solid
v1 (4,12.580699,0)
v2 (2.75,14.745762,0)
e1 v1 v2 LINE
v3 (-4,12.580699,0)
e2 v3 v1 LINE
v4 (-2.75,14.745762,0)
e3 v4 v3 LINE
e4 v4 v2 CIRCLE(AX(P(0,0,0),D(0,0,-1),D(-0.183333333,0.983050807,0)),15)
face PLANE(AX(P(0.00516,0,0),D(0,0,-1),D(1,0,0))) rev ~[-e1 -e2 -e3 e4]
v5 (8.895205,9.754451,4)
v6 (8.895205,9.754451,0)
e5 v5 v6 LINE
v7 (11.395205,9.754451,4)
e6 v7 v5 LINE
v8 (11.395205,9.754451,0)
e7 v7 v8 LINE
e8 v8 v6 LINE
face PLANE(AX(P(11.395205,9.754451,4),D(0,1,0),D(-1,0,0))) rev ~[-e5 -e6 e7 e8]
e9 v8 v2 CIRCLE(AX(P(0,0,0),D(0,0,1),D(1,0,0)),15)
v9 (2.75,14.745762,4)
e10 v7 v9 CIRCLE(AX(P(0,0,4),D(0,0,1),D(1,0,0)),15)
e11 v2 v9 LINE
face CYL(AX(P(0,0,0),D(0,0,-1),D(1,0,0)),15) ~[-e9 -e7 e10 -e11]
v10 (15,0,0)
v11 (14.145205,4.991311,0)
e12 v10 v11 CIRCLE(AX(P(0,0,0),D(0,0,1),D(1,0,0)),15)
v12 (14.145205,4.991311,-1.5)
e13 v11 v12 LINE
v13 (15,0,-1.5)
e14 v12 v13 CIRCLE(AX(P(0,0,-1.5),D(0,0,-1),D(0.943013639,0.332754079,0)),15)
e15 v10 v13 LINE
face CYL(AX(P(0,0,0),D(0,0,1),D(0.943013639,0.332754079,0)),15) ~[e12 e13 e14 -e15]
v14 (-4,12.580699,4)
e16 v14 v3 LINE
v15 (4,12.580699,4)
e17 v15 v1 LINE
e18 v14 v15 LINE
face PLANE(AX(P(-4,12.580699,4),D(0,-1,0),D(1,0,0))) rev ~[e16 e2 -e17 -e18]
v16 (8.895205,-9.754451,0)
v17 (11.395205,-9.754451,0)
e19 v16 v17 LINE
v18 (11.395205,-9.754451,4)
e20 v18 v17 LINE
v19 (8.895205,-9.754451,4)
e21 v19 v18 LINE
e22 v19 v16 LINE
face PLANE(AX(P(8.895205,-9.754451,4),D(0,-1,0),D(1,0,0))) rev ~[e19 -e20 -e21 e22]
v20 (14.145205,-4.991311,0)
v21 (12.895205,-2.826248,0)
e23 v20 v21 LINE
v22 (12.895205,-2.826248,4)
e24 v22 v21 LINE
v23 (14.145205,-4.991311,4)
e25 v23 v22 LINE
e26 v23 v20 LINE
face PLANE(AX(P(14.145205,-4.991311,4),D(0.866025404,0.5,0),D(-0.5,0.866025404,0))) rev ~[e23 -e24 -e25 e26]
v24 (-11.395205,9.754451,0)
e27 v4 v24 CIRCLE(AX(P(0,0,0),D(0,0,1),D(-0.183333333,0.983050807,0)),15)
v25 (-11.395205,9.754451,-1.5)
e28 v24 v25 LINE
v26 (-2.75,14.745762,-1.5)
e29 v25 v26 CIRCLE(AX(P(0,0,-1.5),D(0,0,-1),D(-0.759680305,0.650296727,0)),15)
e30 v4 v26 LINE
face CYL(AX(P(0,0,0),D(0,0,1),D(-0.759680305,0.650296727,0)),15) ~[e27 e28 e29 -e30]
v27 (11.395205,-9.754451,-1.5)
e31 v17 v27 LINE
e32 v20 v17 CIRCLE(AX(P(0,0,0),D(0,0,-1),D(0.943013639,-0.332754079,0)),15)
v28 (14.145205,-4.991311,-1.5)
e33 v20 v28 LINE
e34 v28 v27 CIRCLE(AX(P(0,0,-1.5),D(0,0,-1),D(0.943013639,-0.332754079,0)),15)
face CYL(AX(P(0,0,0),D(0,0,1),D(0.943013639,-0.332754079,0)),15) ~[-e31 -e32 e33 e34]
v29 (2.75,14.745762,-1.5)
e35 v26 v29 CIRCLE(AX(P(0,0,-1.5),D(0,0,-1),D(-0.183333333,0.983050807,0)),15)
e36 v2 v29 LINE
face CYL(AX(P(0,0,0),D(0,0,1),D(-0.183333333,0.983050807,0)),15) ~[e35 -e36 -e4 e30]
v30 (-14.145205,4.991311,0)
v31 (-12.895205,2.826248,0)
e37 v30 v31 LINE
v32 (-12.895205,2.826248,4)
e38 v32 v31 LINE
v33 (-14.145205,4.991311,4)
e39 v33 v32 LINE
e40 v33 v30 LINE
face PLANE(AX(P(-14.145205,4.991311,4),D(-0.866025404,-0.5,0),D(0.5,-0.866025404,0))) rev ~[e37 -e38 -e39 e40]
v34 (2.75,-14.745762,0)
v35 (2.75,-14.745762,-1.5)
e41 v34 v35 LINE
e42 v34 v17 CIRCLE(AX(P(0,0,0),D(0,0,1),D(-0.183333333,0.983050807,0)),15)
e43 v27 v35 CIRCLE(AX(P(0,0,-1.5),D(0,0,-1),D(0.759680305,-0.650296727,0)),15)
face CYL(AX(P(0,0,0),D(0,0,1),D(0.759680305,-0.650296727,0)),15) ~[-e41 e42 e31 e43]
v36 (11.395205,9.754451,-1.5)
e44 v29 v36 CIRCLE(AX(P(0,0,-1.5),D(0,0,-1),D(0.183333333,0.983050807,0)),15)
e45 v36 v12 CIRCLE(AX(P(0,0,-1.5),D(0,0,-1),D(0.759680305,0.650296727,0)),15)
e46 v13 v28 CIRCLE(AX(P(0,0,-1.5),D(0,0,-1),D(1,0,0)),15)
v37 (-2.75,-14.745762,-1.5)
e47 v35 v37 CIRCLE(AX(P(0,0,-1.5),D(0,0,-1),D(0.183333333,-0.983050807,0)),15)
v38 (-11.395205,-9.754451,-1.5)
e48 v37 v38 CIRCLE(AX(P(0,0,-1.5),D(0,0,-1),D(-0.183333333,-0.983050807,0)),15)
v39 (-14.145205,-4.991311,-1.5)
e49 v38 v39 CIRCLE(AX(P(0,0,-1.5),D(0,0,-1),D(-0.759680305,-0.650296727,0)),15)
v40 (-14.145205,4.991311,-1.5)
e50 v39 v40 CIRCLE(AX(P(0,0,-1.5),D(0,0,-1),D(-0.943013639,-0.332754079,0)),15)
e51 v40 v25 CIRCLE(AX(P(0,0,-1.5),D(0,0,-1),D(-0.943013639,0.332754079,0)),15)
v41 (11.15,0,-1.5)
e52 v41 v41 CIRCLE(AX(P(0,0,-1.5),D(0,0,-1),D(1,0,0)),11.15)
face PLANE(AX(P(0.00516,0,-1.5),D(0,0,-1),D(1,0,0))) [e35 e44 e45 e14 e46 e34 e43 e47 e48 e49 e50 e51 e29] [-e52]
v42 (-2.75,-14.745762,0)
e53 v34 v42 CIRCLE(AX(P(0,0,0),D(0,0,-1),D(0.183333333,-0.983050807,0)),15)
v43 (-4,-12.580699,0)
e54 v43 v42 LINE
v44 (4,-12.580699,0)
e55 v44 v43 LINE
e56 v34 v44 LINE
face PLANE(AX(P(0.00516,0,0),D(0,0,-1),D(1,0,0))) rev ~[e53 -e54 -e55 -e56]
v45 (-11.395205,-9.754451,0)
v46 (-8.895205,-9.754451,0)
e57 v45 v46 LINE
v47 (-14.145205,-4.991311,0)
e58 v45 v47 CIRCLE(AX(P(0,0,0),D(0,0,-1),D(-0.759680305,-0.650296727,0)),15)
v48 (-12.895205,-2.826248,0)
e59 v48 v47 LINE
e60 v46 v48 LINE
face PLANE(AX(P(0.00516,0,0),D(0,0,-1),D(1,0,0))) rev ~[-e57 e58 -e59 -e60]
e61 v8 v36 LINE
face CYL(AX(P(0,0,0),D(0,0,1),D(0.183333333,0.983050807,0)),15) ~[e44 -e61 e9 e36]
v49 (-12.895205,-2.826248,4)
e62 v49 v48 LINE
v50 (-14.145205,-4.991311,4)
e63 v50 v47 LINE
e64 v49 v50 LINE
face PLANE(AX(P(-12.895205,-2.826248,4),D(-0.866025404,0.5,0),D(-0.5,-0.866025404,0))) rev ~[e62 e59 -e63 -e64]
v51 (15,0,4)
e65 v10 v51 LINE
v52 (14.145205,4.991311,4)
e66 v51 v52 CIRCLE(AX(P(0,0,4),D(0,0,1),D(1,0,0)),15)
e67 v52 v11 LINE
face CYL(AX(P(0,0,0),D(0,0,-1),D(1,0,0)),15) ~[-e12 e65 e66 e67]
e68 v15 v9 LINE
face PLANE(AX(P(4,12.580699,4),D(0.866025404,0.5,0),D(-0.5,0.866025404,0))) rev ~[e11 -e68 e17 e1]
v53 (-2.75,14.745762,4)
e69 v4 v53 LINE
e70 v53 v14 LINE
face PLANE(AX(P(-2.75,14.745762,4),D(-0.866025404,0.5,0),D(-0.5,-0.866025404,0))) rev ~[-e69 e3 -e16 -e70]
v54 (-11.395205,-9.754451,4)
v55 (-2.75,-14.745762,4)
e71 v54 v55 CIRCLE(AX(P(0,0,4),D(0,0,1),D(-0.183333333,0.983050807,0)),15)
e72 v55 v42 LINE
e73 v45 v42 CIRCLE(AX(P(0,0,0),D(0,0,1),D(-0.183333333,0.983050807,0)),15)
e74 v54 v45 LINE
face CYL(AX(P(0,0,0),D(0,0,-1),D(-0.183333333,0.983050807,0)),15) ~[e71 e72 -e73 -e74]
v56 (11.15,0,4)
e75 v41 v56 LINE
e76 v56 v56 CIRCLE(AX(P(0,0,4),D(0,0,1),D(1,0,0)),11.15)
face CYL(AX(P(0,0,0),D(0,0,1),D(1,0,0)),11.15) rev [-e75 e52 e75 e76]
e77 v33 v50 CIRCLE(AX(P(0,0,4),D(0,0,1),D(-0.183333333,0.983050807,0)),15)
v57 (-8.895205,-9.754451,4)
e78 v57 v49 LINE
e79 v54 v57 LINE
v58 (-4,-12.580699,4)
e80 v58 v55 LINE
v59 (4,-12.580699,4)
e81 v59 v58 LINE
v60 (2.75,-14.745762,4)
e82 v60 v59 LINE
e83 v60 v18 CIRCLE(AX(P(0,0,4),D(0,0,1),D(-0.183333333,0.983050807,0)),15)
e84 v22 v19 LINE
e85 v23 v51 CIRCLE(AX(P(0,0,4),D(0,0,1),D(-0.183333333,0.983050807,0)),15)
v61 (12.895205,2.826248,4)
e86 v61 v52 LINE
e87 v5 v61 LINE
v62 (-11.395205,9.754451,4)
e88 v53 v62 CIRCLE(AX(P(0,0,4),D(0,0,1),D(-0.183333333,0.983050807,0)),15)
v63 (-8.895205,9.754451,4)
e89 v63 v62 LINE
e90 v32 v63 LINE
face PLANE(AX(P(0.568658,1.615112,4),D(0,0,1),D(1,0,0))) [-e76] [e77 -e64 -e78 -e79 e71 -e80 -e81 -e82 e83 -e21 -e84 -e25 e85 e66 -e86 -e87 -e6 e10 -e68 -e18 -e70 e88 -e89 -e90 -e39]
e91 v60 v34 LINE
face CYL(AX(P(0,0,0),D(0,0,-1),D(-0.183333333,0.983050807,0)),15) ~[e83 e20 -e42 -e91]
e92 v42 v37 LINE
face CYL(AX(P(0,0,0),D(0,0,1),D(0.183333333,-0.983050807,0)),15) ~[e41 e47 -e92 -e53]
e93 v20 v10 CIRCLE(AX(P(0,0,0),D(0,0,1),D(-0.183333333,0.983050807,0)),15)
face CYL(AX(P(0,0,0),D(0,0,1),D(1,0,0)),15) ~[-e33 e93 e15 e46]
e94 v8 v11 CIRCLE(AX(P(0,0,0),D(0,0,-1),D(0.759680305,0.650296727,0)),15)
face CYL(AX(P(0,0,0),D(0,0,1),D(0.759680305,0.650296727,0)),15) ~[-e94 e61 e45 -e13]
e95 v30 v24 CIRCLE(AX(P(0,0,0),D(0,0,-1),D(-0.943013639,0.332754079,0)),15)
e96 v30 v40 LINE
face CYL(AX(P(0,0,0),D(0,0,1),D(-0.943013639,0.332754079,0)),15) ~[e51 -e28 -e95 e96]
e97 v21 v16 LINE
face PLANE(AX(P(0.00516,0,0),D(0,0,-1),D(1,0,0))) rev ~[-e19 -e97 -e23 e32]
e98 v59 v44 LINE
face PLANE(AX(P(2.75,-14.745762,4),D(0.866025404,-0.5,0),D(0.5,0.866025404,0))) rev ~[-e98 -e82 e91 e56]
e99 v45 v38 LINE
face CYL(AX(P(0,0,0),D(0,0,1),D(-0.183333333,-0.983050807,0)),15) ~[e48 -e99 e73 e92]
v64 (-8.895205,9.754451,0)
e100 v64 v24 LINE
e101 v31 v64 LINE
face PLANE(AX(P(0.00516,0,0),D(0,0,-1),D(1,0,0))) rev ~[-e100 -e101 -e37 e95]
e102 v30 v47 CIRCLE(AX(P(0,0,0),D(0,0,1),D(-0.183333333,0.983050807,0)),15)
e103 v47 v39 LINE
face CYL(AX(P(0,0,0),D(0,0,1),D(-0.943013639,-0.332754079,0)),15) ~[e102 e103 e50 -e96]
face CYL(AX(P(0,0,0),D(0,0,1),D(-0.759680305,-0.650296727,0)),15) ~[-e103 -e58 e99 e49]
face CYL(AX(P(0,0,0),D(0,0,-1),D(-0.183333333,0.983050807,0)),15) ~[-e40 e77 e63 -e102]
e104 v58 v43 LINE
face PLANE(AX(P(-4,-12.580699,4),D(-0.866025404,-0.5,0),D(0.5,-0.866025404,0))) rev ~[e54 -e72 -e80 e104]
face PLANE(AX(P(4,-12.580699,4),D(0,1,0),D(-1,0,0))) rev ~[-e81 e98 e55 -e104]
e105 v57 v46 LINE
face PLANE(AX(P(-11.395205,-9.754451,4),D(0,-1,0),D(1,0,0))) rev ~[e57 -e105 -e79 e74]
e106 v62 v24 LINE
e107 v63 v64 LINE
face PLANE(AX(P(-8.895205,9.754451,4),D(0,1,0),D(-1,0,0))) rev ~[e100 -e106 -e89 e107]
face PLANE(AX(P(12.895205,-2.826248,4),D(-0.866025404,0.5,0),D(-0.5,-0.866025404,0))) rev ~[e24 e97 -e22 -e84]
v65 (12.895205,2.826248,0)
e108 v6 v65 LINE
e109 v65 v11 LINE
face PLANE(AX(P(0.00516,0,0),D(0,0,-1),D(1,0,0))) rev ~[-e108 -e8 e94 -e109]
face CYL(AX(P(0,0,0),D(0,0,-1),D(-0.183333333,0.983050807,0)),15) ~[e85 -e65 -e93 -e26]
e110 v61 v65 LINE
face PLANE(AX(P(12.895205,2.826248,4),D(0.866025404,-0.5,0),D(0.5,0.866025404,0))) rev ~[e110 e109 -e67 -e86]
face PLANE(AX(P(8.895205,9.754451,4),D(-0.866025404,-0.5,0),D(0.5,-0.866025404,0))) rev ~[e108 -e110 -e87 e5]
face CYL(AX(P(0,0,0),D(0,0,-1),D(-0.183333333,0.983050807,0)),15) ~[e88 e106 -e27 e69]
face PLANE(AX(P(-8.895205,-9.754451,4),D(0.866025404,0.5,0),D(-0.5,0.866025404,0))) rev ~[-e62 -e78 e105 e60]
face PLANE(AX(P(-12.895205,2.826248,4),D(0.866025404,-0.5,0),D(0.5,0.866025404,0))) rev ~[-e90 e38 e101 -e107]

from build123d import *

# Parameters (mm, degrees)
F0_R     = 11.15
F1_DEPTH = 4
F3_DEPTH = 16.2
F4_R     = 11.15
F5_DEPTH = 1.5


with BuildPart() as f1:
    # F0 (on Top) → F1 (new body)
    with BuildSketch(Plane.XY):
        with BuildLine():
            ThreePointArc((-2.75, 14.7457621031), (-9.5851447563, -11.5379807592), (15, 0))
            ThreePointArc((15, 0), (11.5379807592, 9.5851447563), (2.75, 14.7457621031))
            Line((2.75, 14.7457621031), (4, 12.5806985936))
            Line((4, 12.5806985936), (0, 12.5806985936))
            Line((0, 12.5806985936), (-4, 12.5806985936))
            Line((-4, 12.5806985936), (-2.75, 14.7457621031))
        make_face()
        Circle(F0_R, mode=Mode.SUBTRACT)
        with BuildLine():
            Line((4, 12.5806985936), (2.75, 14.7457621031))
            ThreePointArc((2.75, 14.7457621031), (0, 15), (-2.75, 14.7457621031))
            Line((-2.75, 14.7457621031), (-4, 12.5806985936))
            Line((-4, 12.5806985936), (0, 12.5806985936))
            Line((0, 12.5806985936), (4, 12.5806985936))
        make_face()
    extrude(amount=F1_DEPTH)

    # F2 (on face) → F3 (cut)
    with BuildSketch(Plane.XY.offset(4)):
        with BuildLine():
            ThreePointArc((-11.3952045794, 9.7544509119), (-12.9903810568, 7.5), (-14.1452045794, 4.9913111911))
            Line((-14.1452045794, 4.9913111911), (-12.8952045794, 2.8262476817))
            Line((-12.8952045794, 2.8262476817), (-8.8952045794, 9.7544509119))
            Line((-8.8952045794, 9.7544509119), (-11.3952045794, 9.7544509119))
        make_face()
        with BuildLine():
            Line((-12.8952045794, -2.8262476817), (-14.1452045794, -4.9913111911))
            ThreePointArc((-14.1452045794, -4.9913111911), (-12.9903810568, -7.5), (-11.3952045794, -9.7544509119))
            Line((-11.3952045794, -9.7544509119), (-8.8952045794, -9.7544509119))
            Line((-8.8952045794, -9.7544509119), (-12.8952045794, -2.8262476817))
        make_face()
        with BuildLine():
            Line((-4, -12.5806985936), (-2.75, -14.7457621031))
            ThreePointArc((-2.75, -14.7457621031), (0, -15), (2.75, -14.7457621031))
            Line((2.75, -14.7457621031), (4, -12.5806985936))
            Line((4, -12.5806985936), (-4, -12.5806985936))
        make_face()
        with BuildLine():
            Line((8.8952045794, -9.7544509119), (11.3952045794, -9.7544509119))
            ThreePointArc((11.3952045794, -9.7544509119), (12.9903810568, -7.5), (14.1452045794, -4.9913111911))
            Line((14.1452045794, -4.9913111911), (12.8952045794, -2.8262476817))
            Line((12.8952045794, -2.8262476817), (8.8952045794, -9.7544509119))
        make_face()
        with BuildLine():
            ThreePointArc((14.1452045794, 4.9913111911), (12.9903810568, 7.5), (11.3952045794, 9.7544509119))
            Line((11.3952045794, 9.7544509119), (8.8952045794, 9.7544509119))
            Line((8.8952045794, 9.7544509119), (12.8952045794, 2.8262476817))
            Line((12.8952045794, 2.8262476817), (14.1452045794, 4.9913111911))
        make_face()
        with BuildLine():
            ThreePointArc((2.75, 14.7457621031), (0, 15), (-2.75, 14.7457621031))
            Line((-2.75, 14.7457621031), (-4, 12.5806985936))
            Line((-4, 12.5806985936), (4, 12.5806985936))
            Line((4, 12.5806985936), (2.75, 14.7457621031))
        make_face()
    extrude(amount=-F3_DEPTH, mode=Mode.SUBTRACT)

    # F4 (on face) → F5 (join)
    with BuildSketch(Plane(origin=(0, 0, 0), x_dir=(1, 0, 0), z_dir=(0, 0, -1))):
        with BuildLine():
            ThreePointArc((14.1452045794, -4.9913111911), (14.784756824, -2.5319884783), (15, 0))
            ThreePointArc((15, 0), (14.784756824, 2.5319884783), (14.1452045794, 4.9913111911))
            Line((14.1452045794, 4.9913111911), (12.8952045794, 2.8262476817))
            Line((12.8952045794, 2.8262476817), (8.8952045794, 9.7544509119))
            Line((8.8952045794, 9.7544509119), (11.3952045794, 9.7544509119))
            ThreePointArc((11.3952045794, 9.7544509119), (7.5, 12.9903810568), (2.75, 14.7457621031))
            Line((2.75, 14.7457621031), (4, 12.5806985936))
            Line((4, 12.5806985936), (-4, 12.5806985936))
            Line((-4, 12.5806985936), (-2.75, 14.7457621031))
            ThreePointArc((-2.75, 14.7457621031), (-7.5, 12.9903810568), (-11.3952045794, 9.7544509119))
            Line((-11.3952045794, 9.7544509119), (-8.8952045794, 9.7544509119))
            Line((-8.8952045794, 9.7544509119), (-12.8952045794, 2.8262476817))
            Line((-12.8952045794, 2.8262476817), (-14.1452045794, 4.9913111911))
            ThreePointArc((-14.1452045794, 4.9913111911), (-15, 0), (-14.1452045794, -4.9913111911))
            Line((-14.1452045794, -4.9913111911), (-12.8952045794, -2.8262476817))
            Line((-12.8952045794, -2.8262476817), (-8.8952045794, -9.7544509119))
            Line((-8.8952045794, -9.7544509119), (-11.3952045794, -9.7544509119))
            ThreePointArc((-11.3952045794, -9.7544509119), (-7.5, -12.9903810568), (-2.75, -14.7457621031))
            Line((-2.75, -14.7457621031), (-4, -12.5806985936))
            Line((-4, -12.5806985936), (4, -12.5806985936))
            Line((4, -12.5806985936), (2.75, -14.7457621031))
            ThreePointArc((2.75, -14.7457621031), (7.5, -12.9903810568), (11.3952045794, -9.7544509119))
            Line((11.3952045794, -9.7544509119), (8.8952045794, -9.7544509119))
            Line((8.8952045794, -9.7544509119), (12.8952045794, -2.8262476817))
            Line((12.8952045794, -2.8262476817), (14.1452045794, -4.9913111911))
        make_face()
        Circle(F4_R, mode=Mode.SUBTRACT)
        with BuildLine():
            Line((12.8952045794, 2.8262476817), (14.1452045794, 4.9913111911))
            ThreePointArc((14.1452045794, 4.9913111911), (12.9903810568, 7.5), (11.3952045794, 9.7544509119))
            Line((11.3952045794, 9.7544509119), (8.8952045794, 9.7544509119))
            Line((8.8952045794, 9.7544509119), (12.8952045794, 2.8262476817))
        make_face()
        with BuildLine():
            ThreePointArc((11.3952045794, -9.7544509119), (12.9903810568, -7.5), (14.1452045794, -4.9913111911))
            Line((14.1452045794, -4.9913111911), (12.8952045794, -2.8262476817))
            Line((12.8952045794, -2.8262476817), (8.8952045794, -9.7544509119))
            Line((8.8952045794, -9.7544509119), (11.3952045794, -9.7544509119))
        make_face()
        with BuildLine():
            Line((4, 12.5806985936), (2.75, 14.7457621031))
            ThreePointArc((2.75, 14.7457621031), (0, 15), (-2.75, 14.7457621031))
            Line((-2.75, 14.7457621031), (-4, 12.5806985936))
            Line((-4, 12.5806985936), (4, 12.5806985936))
        make_face()
        with BuildLine():
            ThreePointArc((-2.75, -14.7457621031), (0, -15), (2.75, -14.7457621031))
            Line((2.75, -14.7457621031), (4, -12.5806985936))
            Line((4, -12.5806985936), (-4, -12.5806985936))
            Line((-4, -12.5806985936), (-2.75, -14.7457621031))
        make_face()
        with BuildLine():
            Line((-8.8952045794, 9.7544509119), (-11.3952045794, 9.7544509119))
            ThreePointArc((-11.3952045794, 9.7544509119), (-12.9903810568, 7.5), (-14.1452045794, 4.9913111911))
            Line((-14.1452045794, 4.9913111911), (-12.8952045794, 2.8262476817))
            Line((-12.8952045794, 2.8262476817), (-8.8952045794, 9.7544509119))
        make_face()
        with BuildLine():
            ThreePointArc((-14.1452045794, -4.9913111911), (-12.9903810568, -7.5), (-11.3952045794, -9.7544509119))
            Line((-11.3952045794, -9.7544509119), (-8.8952045794, -9.7544509119))
            Line((-8.8952045794, -9.7544509119), (-12.8952045794, -2.8262476817))
            Line((-12.8952045794, -2.8262476817), (-14.1452045794, -4.9913111911))
        make_face()
    extrude(amount=F5_DEPTH)


solid = f1.part
